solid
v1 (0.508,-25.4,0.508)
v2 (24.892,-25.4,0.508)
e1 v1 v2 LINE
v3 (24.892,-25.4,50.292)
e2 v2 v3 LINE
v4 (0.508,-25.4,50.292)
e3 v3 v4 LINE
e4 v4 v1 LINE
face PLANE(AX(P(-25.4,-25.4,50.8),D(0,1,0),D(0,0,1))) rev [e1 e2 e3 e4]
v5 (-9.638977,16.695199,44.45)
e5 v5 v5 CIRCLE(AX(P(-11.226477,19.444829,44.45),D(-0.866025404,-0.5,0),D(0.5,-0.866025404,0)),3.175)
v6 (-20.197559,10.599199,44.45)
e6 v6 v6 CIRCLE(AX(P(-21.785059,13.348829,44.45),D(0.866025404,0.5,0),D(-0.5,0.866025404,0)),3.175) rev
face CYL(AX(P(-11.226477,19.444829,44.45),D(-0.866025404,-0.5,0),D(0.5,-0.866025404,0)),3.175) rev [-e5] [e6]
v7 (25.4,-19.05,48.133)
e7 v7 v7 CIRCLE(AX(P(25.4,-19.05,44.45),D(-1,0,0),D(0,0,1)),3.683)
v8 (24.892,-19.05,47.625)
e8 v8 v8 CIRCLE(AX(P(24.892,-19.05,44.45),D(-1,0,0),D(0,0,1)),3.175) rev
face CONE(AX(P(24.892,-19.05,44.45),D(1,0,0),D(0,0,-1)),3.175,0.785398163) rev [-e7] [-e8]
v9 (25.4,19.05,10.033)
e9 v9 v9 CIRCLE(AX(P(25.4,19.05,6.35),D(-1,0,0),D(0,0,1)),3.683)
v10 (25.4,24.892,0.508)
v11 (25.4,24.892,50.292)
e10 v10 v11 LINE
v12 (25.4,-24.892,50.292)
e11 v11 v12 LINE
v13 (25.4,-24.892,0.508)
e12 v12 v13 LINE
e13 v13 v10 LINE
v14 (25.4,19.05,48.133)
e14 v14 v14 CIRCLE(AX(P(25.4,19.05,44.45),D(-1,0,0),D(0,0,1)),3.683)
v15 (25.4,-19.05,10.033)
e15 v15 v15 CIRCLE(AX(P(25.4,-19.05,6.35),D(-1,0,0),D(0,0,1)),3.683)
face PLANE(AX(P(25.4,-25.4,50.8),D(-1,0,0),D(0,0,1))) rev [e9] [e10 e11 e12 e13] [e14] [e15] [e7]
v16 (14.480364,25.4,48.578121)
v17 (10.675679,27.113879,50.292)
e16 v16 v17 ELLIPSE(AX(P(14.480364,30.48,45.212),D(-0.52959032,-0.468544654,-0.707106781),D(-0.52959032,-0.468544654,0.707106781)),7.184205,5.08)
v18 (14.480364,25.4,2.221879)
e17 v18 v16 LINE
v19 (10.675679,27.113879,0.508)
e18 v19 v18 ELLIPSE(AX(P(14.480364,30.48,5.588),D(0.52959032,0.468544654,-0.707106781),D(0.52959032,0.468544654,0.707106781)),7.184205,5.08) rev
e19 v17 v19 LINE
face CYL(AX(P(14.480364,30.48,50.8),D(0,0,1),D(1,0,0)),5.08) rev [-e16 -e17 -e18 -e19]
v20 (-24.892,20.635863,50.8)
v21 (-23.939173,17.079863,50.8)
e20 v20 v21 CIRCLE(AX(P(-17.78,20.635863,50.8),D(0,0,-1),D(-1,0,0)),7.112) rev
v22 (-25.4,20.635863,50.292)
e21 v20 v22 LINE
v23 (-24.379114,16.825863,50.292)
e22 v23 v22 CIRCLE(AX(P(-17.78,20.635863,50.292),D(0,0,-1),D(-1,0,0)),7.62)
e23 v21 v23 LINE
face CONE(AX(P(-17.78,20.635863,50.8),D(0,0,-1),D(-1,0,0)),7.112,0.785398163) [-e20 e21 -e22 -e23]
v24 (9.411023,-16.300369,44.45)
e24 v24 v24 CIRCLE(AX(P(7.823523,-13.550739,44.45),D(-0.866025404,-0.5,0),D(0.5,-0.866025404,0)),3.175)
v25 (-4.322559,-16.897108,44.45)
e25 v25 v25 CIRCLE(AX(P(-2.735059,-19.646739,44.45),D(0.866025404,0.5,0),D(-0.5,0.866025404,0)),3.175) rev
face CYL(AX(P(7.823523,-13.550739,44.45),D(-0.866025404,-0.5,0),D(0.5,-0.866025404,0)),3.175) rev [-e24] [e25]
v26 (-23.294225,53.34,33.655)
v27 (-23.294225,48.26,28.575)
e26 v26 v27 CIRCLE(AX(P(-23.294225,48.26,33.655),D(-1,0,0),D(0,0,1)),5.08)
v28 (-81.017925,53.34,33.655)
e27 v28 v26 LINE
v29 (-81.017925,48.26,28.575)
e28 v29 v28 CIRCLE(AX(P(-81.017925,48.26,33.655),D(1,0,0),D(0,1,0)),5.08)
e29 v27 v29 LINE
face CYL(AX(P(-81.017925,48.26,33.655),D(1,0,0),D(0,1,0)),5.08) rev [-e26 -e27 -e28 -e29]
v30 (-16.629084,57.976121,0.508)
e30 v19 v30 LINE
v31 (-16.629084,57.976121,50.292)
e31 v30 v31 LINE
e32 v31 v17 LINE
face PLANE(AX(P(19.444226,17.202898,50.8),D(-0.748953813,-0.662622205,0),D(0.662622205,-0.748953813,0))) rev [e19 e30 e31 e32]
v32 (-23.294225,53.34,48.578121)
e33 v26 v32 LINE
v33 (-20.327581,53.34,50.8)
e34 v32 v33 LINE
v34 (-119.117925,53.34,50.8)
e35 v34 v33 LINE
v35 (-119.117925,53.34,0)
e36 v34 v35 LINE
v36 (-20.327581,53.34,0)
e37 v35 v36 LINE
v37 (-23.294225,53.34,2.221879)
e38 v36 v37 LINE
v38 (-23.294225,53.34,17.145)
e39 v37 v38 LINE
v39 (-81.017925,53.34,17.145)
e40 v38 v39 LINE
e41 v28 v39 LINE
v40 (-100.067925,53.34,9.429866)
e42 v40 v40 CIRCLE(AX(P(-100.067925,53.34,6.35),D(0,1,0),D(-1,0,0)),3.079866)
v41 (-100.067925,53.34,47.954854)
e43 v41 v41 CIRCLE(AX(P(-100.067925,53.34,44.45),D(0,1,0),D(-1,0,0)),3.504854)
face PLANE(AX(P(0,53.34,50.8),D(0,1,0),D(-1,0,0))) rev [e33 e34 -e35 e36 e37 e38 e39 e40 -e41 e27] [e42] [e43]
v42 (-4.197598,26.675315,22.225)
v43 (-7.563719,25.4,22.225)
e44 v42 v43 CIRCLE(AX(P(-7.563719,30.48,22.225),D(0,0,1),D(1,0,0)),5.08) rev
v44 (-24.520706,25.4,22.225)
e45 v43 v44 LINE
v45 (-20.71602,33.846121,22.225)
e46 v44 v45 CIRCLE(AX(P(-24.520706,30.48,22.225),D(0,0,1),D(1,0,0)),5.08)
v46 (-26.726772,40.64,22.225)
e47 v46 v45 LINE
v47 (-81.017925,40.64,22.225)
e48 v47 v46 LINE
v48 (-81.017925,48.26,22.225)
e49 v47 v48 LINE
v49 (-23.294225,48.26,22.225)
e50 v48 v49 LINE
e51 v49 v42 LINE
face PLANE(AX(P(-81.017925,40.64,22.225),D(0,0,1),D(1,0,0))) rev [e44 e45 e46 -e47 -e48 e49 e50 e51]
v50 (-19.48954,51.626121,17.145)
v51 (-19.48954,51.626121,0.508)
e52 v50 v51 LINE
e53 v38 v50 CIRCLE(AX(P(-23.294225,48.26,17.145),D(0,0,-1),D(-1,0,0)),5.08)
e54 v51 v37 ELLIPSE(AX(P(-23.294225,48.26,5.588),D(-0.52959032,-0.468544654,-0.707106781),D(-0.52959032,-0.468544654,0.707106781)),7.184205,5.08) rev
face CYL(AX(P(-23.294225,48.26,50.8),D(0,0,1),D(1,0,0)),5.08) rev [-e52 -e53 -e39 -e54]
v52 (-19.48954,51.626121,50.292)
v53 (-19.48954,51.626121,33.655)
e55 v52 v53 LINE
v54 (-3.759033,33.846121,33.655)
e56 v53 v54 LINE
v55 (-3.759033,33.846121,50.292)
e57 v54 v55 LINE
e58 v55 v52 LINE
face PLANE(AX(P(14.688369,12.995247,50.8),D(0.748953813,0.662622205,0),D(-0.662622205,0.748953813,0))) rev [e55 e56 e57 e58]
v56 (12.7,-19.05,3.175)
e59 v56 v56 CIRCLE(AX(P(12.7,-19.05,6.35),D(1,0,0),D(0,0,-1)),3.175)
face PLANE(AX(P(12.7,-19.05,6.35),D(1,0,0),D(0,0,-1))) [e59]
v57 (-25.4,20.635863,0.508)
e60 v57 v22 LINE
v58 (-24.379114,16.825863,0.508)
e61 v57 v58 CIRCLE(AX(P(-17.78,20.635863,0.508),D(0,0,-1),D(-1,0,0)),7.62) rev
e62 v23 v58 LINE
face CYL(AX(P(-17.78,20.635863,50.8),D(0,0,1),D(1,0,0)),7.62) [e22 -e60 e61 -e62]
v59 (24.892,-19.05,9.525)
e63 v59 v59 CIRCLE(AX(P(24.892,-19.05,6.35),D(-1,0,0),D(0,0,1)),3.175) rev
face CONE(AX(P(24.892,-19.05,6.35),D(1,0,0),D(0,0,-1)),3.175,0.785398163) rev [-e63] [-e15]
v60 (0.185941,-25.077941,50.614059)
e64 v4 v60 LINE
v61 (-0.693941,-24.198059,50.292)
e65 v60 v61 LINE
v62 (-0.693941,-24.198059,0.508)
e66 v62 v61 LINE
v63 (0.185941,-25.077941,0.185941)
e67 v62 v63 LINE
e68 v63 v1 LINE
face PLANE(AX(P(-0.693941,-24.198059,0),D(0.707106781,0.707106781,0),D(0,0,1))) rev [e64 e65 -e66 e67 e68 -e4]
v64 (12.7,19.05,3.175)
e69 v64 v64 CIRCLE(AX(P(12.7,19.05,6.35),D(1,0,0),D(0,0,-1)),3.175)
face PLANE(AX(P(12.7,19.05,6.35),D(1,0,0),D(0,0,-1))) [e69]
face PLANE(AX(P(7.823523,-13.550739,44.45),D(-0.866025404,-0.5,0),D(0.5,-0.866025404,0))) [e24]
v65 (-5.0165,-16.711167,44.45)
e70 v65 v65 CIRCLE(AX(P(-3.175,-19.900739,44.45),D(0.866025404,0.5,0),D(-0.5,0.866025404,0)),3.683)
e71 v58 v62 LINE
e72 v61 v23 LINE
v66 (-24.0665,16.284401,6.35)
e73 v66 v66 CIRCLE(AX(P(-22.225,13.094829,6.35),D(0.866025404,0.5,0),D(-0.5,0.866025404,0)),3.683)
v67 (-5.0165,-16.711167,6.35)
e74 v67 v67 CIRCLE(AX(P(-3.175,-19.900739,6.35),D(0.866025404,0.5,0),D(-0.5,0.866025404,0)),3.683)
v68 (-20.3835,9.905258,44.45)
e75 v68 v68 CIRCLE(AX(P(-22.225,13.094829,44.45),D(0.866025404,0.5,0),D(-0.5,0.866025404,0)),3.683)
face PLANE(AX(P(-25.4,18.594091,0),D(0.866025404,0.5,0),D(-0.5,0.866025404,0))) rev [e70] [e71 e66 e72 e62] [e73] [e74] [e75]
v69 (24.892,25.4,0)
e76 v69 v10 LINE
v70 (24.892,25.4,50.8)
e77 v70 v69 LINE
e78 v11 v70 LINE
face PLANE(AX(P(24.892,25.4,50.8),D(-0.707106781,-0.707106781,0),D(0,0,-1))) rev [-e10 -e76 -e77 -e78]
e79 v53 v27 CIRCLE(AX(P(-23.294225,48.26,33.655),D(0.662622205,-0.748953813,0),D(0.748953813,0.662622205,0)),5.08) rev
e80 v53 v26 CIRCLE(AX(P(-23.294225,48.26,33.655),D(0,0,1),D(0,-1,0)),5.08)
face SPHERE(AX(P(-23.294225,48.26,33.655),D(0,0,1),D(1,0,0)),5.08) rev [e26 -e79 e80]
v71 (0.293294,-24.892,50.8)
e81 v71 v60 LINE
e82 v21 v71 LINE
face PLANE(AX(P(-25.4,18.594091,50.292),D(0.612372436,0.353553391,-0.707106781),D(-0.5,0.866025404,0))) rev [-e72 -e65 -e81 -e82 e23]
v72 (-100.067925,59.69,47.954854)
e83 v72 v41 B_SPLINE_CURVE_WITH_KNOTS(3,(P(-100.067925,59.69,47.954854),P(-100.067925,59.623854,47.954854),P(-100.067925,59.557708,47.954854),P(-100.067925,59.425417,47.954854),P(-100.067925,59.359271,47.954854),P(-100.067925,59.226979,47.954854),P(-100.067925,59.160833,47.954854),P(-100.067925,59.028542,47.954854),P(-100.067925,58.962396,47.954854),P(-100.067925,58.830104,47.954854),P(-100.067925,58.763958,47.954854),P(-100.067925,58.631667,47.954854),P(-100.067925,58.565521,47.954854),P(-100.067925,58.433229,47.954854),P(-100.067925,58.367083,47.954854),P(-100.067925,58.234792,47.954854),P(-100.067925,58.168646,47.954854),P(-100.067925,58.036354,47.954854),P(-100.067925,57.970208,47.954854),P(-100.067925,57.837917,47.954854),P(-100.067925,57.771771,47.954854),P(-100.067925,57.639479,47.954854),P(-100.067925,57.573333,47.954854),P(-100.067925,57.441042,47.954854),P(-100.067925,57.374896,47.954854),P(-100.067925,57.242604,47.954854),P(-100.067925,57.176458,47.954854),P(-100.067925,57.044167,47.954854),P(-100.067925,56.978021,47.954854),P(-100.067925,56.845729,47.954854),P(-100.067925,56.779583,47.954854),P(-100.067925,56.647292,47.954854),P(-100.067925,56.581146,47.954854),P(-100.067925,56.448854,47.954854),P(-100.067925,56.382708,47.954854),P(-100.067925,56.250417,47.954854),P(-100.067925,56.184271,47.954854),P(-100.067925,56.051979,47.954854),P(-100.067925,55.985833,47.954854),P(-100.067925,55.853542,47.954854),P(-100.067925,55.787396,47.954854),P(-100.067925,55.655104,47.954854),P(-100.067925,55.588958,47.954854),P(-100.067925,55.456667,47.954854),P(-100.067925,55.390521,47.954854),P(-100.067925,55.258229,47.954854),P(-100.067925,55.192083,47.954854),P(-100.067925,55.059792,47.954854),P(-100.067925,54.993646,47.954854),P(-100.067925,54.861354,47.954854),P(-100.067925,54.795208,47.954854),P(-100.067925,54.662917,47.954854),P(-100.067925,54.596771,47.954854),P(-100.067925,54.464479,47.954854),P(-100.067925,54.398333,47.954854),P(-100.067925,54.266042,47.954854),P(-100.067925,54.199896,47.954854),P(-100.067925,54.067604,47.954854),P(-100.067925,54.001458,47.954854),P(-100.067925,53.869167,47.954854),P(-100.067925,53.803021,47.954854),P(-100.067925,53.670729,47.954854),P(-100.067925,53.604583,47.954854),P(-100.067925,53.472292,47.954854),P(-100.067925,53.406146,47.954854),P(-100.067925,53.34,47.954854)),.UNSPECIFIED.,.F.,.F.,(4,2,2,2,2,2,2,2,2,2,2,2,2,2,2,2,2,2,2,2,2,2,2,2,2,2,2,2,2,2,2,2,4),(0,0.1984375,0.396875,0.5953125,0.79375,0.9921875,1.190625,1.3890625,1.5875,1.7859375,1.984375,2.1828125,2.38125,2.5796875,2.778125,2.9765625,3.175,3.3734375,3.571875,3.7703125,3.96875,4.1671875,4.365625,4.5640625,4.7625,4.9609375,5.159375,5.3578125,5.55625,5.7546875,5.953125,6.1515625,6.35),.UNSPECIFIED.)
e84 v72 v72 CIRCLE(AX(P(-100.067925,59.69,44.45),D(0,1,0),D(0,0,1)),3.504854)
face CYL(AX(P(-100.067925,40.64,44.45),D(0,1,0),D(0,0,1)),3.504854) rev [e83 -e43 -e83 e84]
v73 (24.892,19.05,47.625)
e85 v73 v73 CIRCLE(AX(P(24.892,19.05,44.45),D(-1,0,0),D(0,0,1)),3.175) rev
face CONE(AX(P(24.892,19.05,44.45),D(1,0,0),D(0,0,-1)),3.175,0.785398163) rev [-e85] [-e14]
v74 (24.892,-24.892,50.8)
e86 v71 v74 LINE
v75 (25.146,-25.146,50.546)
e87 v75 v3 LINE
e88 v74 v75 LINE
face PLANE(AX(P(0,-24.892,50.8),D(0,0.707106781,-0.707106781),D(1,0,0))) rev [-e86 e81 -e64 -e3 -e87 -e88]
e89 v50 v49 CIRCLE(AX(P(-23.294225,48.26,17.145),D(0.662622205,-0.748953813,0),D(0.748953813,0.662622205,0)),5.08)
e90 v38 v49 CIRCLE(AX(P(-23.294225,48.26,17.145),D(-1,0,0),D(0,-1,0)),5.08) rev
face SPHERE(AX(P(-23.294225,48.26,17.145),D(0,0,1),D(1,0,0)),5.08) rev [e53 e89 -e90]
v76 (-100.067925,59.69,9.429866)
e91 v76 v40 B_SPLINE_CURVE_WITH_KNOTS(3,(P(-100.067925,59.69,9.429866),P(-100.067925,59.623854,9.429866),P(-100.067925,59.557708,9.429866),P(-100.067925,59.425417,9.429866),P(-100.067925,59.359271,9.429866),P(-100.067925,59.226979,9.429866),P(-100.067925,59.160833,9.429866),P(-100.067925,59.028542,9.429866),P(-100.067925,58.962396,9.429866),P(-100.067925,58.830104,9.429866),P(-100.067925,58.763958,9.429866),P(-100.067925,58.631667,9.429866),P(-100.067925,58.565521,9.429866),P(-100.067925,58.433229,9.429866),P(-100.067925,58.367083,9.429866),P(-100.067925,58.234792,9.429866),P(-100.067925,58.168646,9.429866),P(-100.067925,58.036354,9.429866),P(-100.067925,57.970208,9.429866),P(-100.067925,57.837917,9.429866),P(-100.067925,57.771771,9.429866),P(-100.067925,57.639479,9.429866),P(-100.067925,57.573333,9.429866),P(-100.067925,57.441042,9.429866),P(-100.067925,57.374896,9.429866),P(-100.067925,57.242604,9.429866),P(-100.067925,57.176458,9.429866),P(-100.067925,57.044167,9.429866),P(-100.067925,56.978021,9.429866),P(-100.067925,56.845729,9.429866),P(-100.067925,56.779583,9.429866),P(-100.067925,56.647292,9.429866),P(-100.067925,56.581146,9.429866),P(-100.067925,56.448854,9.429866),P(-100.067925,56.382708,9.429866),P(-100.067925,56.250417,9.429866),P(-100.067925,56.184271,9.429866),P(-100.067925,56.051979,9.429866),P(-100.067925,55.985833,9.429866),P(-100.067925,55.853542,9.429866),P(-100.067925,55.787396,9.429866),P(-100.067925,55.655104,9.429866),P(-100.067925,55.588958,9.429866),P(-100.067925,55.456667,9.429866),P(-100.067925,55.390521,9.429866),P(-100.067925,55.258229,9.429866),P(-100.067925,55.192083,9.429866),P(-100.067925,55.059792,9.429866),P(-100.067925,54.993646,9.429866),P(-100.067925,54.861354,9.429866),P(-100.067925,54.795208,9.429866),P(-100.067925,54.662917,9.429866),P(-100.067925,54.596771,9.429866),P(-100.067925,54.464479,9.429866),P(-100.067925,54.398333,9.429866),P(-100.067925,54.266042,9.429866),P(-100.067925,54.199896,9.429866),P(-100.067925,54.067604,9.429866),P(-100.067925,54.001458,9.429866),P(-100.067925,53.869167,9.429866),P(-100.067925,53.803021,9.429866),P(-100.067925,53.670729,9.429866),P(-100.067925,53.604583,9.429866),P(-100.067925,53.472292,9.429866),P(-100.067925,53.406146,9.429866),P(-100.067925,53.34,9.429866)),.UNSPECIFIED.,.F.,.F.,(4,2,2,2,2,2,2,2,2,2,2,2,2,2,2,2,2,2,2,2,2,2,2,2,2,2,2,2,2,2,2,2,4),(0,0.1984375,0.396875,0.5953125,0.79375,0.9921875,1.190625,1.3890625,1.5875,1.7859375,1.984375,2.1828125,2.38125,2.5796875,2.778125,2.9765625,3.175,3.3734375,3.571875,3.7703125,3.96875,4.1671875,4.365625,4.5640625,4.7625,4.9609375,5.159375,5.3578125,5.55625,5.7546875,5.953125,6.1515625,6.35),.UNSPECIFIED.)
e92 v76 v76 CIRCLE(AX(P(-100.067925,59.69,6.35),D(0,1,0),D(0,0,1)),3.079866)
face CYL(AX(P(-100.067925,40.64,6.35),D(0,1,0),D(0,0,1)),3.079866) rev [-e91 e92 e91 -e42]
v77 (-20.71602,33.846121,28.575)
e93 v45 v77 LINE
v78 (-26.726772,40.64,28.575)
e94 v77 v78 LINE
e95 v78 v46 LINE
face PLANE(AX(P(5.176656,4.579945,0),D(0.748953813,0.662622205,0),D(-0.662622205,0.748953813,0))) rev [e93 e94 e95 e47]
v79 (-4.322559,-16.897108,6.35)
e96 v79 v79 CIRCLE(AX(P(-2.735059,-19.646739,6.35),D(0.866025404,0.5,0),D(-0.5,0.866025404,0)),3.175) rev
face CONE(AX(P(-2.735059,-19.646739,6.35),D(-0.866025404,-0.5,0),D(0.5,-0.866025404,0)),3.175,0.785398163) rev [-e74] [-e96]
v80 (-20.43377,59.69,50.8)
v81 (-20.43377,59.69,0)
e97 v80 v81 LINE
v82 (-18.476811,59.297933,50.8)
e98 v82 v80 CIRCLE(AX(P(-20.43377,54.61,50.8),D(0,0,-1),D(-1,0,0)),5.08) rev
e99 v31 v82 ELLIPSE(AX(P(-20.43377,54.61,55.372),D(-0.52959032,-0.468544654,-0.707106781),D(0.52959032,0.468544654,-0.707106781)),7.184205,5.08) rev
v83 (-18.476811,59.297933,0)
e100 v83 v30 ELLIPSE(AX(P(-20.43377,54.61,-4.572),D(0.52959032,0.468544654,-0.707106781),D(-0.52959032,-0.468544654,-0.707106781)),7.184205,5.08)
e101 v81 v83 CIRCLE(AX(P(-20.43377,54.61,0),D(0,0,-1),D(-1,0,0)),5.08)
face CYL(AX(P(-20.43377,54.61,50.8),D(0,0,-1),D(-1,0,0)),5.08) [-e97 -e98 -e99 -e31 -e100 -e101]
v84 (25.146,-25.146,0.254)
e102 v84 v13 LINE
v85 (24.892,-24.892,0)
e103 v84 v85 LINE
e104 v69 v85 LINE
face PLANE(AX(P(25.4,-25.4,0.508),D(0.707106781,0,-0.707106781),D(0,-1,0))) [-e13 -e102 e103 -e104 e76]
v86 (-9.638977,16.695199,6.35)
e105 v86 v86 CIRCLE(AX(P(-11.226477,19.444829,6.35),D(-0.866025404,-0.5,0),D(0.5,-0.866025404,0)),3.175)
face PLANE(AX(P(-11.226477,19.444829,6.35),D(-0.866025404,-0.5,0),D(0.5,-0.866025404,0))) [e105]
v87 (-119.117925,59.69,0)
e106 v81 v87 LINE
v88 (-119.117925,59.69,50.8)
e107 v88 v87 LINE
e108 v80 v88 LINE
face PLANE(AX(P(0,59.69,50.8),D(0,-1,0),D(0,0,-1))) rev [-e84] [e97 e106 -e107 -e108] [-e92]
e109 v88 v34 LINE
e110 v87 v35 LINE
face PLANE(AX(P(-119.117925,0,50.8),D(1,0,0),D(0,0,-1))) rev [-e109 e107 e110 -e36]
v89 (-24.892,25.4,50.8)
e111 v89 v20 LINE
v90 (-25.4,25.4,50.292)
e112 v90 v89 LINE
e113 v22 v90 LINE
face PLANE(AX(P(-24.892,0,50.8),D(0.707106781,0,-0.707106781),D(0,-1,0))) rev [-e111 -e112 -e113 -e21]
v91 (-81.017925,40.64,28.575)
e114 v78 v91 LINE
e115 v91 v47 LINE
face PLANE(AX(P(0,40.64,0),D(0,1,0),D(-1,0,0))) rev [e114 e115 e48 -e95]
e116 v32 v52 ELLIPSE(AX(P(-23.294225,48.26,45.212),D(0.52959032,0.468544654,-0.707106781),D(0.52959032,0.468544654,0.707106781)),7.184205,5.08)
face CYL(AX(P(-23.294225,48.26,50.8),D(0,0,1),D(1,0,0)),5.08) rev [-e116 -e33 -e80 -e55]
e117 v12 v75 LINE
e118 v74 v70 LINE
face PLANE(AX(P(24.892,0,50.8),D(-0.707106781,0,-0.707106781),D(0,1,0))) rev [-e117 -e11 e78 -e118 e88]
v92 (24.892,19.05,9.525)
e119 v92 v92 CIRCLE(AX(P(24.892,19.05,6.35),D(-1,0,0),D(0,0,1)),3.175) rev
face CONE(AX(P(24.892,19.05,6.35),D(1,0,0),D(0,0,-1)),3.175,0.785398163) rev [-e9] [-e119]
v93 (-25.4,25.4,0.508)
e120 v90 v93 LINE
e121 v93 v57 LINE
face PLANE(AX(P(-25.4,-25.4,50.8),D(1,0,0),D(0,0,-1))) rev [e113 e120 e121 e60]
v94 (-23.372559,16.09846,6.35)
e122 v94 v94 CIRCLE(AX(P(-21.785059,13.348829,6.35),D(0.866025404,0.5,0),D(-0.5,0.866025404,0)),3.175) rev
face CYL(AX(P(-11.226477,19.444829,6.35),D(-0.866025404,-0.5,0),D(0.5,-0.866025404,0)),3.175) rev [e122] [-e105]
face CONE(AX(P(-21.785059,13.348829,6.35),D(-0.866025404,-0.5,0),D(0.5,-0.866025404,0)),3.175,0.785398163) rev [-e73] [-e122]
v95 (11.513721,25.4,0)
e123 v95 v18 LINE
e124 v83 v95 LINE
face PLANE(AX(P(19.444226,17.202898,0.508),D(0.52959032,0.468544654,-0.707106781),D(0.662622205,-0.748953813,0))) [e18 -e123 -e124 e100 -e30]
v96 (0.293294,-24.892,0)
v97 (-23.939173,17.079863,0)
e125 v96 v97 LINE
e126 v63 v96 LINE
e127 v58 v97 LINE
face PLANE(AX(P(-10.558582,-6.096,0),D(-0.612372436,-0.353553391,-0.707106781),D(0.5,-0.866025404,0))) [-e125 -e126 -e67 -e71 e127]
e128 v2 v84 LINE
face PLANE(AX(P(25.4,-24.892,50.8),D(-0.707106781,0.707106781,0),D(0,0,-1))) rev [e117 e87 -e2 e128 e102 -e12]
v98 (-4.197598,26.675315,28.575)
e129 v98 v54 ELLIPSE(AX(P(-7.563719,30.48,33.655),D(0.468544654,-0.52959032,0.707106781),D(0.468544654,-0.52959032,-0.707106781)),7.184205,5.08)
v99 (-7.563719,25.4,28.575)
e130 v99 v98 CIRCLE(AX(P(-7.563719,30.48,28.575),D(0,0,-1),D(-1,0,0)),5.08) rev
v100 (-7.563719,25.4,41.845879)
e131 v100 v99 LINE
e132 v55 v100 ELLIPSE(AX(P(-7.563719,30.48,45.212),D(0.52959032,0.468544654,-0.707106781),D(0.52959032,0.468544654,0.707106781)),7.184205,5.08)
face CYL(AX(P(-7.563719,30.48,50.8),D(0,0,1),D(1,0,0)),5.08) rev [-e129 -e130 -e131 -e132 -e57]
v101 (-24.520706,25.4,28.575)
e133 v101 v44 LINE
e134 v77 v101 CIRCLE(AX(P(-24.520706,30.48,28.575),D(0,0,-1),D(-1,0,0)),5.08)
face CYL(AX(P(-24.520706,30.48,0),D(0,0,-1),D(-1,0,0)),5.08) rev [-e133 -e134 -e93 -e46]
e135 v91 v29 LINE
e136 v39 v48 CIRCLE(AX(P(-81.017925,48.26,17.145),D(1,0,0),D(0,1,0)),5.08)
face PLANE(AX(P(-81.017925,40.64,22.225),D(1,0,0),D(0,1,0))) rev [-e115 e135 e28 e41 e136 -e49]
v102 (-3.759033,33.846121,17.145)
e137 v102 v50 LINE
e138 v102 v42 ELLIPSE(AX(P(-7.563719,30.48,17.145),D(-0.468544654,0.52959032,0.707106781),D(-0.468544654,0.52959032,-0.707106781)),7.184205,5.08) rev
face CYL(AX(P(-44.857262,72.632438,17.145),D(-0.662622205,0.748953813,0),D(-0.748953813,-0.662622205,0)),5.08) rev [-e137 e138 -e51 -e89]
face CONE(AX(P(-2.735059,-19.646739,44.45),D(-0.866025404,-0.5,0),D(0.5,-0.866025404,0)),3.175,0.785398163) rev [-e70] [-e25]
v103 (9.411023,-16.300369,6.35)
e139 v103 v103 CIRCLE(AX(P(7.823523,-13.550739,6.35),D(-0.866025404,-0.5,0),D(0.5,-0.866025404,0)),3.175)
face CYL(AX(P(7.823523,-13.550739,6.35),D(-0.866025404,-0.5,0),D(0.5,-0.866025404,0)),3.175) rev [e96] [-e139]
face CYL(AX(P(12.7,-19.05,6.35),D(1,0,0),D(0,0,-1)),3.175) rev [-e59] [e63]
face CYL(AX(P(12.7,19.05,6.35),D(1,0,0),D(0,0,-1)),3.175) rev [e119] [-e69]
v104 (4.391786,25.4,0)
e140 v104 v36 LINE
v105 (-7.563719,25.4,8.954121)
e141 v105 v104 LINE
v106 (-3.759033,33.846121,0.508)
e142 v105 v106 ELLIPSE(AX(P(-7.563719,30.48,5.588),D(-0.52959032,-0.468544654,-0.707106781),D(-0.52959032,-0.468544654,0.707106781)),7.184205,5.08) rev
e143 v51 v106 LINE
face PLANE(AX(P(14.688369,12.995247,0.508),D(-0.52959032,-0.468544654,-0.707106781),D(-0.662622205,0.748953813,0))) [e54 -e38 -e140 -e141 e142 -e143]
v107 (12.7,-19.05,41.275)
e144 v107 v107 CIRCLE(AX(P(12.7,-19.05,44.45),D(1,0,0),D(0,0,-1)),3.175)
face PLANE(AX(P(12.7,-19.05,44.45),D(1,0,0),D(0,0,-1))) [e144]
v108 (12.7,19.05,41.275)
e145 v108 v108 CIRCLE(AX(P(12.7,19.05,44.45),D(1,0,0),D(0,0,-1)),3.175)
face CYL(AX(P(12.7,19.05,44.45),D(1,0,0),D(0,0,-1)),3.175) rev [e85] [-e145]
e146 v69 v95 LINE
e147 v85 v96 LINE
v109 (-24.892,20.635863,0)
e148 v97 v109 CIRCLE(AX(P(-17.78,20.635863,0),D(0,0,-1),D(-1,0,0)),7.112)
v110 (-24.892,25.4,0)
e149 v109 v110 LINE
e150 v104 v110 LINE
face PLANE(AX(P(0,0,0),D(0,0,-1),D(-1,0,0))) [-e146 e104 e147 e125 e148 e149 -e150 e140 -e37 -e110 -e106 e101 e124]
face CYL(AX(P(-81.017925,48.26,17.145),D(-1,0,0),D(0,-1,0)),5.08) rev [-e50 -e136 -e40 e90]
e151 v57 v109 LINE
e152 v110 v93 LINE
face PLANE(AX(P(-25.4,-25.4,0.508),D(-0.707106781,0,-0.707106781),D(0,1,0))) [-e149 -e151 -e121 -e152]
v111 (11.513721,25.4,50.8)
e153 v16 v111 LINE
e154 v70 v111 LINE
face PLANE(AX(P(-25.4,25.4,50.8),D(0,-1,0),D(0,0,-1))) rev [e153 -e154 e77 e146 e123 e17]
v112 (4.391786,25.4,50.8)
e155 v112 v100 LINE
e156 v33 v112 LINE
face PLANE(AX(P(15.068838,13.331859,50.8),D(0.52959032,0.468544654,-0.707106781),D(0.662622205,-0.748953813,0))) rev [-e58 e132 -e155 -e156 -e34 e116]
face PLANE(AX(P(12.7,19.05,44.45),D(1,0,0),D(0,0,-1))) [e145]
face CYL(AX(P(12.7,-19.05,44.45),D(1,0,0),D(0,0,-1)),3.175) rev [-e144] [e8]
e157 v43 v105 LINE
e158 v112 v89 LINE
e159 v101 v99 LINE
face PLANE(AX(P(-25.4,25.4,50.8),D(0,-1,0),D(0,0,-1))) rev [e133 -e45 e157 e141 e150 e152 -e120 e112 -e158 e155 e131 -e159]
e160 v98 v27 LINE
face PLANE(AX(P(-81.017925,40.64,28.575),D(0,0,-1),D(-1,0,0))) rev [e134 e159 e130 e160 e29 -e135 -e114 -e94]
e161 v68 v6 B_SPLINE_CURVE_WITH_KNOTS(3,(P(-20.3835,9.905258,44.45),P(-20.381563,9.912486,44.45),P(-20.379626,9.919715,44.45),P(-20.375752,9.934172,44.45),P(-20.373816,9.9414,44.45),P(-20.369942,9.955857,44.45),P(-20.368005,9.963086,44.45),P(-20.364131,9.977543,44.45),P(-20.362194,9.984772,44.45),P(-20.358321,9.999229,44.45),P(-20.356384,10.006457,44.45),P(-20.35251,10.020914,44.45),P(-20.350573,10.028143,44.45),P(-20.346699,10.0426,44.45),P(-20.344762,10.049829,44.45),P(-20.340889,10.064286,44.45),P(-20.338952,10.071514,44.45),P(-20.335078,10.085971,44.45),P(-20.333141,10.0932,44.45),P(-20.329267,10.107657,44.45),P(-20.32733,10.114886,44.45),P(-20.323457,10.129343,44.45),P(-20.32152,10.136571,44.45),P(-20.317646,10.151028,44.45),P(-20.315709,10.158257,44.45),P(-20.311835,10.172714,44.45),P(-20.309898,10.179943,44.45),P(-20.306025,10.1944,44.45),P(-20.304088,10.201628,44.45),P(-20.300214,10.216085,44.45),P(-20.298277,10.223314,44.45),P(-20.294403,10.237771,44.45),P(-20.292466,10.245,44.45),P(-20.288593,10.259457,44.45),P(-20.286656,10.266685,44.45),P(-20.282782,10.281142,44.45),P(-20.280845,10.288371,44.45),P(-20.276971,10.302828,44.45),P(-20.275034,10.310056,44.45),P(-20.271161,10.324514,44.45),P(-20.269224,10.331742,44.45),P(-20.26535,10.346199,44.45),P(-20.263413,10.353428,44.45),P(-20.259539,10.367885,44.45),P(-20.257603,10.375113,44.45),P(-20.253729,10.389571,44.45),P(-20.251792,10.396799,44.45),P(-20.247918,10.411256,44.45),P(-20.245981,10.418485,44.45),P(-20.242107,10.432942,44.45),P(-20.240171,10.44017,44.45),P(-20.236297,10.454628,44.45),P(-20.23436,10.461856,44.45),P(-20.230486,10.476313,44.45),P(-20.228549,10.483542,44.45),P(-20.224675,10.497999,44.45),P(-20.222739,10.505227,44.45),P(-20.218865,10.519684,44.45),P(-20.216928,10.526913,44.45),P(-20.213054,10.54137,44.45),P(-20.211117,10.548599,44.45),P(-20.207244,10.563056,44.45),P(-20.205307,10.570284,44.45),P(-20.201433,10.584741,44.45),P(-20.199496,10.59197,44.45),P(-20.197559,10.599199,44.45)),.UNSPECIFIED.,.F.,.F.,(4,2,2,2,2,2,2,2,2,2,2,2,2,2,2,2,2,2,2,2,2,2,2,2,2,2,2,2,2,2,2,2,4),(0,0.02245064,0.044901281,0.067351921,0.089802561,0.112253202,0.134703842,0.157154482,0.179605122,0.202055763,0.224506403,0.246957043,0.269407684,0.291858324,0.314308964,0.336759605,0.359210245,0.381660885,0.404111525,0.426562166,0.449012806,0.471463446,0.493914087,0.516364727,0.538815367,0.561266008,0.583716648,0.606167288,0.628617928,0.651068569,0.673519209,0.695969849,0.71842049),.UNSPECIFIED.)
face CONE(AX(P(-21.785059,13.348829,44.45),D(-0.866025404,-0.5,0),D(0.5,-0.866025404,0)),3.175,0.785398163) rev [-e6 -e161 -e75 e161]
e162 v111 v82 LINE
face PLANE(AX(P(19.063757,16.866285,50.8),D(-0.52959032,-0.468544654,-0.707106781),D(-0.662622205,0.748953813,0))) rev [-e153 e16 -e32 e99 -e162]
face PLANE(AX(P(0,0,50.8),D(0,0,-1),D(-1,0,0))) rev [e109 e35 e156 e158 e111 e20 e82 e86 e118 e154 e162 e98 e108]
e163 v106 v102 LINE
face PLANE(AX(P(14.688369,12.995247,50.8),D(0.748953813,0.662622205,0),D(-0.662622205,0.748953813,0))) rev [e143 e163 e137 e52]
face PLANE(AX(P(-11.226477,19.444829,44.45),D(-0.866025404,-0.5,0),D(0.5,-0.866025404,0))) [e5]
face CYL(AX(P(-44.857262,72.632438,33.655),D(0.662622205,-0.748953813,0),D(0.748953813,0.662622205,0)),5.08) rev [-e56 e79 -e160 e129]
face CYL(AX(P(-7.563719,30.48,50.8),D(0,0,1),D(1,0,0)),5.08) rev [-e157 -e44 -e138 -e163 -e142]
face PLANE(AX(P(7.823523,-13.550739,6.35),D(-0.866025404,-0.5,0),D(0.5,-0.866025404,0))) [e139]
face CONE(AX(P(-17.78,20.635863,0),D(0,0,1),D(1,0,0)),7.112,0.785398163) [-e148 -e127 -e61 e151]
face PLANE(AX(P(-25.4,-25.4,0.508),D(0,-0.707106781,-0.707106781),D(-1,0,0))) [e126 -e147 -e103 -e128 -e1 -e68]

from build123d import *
from OCP.BRepFilletAPI import BRepFilletAPI_MakeChamfer

# Parameters (mm, degrees)
SKETCH1_W           = 50.8
SKETCH1_H           = 50.8
BOSS_EXTRUDE1_DEPTH = 50.8
CUT_EXTRUDE1_DEPTH  = 50.8
SKETCH4_R           = 3.175
CUT_EXTRUDE2_DEPTH  = 12.7
SKETCH5_R           = 3.175
CUT_EXTRUDE3_DEPTH  = 12.7
CHAMFER1_SIZE       = 0.508
CHAMFER3_SIZE       = 0.508
CHAMFER3_SIZE2      = 1.38788181
FILLET3_R           = 7.62
BOSS_EXTRUDE2_DEPTH = 50.8
CHAMFER4_SIZE       = 0.508
CHAMFER5_SIZE       = 0.508
SKETCH7_R           = 3.079866406
SKETCH7_R_2         = 3.504854353
CUT_EXTRUDE4_DEPTH  = 19.05
SKETCH9_W           = 60.012063762
SKETCH9_H           = 6.35
BOSS_EXTRUDE4_DEPTH = 12.7
SKETCH10_W          = 6.35
SKETCH10_H          = 37.305371191
BOSS_EXTRUDE5_DEPTH = 12.7
FILLET6_R           = 5.08


with BuildPart() as part:
    # Sketch1 → Boss-Extrude1 (new body)
    with BuildSketch(Plane.XY):
        Rectangle(SKETCH1_W, SKETCH1_H)
    extrude(amount=BOSS_EXTRUDE1_DEPTH)

    # Sketch2 → Cut-Extrude1 (cut)
    with BuildSketch(Plane.XY.offset(50.8)):
        Polygon((-25.4, 18.594090512), (0, -25.4), (-25.4, -25.4), align=None)
    extrude(amount=-CUT_EXTRUDE1_DEPTH, mode=Mode.SUBTRACT)

    # Sketch4 → Cut-Extrude2 (cut)
    with BuildSketch(Plane(origin=(25.4, 0, 0), x_dir=(0, 0, -1), z_dir=(1, 0, 0))):
        with Locations((-44.45, 19.05)):
            Circle(SKETCH4_R)
        with Locations((-6.35, 19.05)):
            Circle(SKETCH4_R)
        with Locations((-6.35, -19.05)):
            Circle(SKETCH4_R)
        with Locations((-44.45, -19.05)):
            Circle(SKETCH4_R)
    extrude(amount=-CUT_EXTRUDE2_DEPTH, mode=Mode.SUBTRACT)

    # Sketch5 → Cut-Extrude3 (cut)
    with BuildSketch(Plane(origin=(-10.998522628, -6.35, 0), x_dir=(0, 0, 1), z_dir=(-0.8660254037844364, -0.5000000000000041, 0))):
        with Locations(Location((6.35, 22.452954744, 0), (0, 0, 270))):
            Circle(SKETCH5_R)
        with Locations(Location((44.45, 22.452954744, 0), (0, 0, 270))):
            Circle(SKETCH5_R)
        with Locations(Location((44.45, -15.647045256, 0), (0, 0, 270))):
            Circle(SKETCH5_R)
        with Locations(Location((6.35, -15.647045256, 0), (0, 0, 270))):
            Circle(SKETCH5_R)
    extrude(amount=-CUT_EXTRUDE3_DEPTH, mode=Mode.SUBTRACT)

    # Chamfer1
    chamfer1_edges = [part.edges().sort_by_distance(p)[0] for p in [
        (25.4, -19.05, 47.625),
        (25.4, -19.05, 9.525),
        (25.4, 19.05, 9.525),
        (25.4, 19.05, 47.625),
        (25.4, 0, 50.8),
        (25.4, 0, 0),
        (25.4, -25.4, 25.4),
        (25.4, 25.4, 25.4),
    ]]
    chamfer(chamfer1_edges, length=CHAMFER1_SIZE)

    # Chamfer3: one chamfer whose edges measure the first distance from different faces: ONE call of the kernel's chamfer builder (chamfer() names one face for all edges)
    chamfer3_edges_1 = [part.edges().sort_by_distance(p)[0] for p in [
        (0, -25.4, 25.4),
    ]]
    chamfer3_side_1 = [part.faces().sort_by_distance(p)[0] for p in [
        (12.446, -25.4, 25.4),
    ]]
    chamfer3_edges_2 = [part.edges().sort_by_distance(p)[0] for p in [
        (-4.7625, -17.151108029, 6.35),
        (-4.7625, -17.151108029, 44.45),
        (-23.8125, 15.844459855, 44.45),
        (-23.8125, 15.844459855, 6.35),
    ]]
    chamfer3 = BRepFilletAPI_MakeChamfer(part.part.solid().wrapped)
    for e in chamfer3_edges_1:
        chamfer3.Add(CHAMFER3_SIZE, CHAMFER3_SIZE2, e.wrapped, chamfer3_side_1[0].wrapped)  # the first distance lies on this face
    for e in chamfer3_edges_2:
        chamfer3.Add(CHAMFER3_SIZE, e.wrapped)
    add(Compound.cast(chamfer3.Shape()), mode=Mode.REPLACE)

    # Fillet3
    fillet3_edges = [part.edges().sort_by_distance(p)[0] for p in [
        (-25.4, 18.594090512, 25.4),
    ]]
    fillet(fillet3_edges, radius=FILLET3_R)

    # Sketch6 → Boss-Extrude2 (add, through all)
    with BuildSketch(Plane(origin=(0, 0, 0), x_dir=(-1, 0, 0), z_dir=(0, 0, -1))):
        Polygon((18.145405324, 59.69), (-12.192, 25.4), (-3.713506547, 25.4), (21.005860753, 53.34), (119.117924515, 53.34), (119.117924515, 59.69), align=None)
    extrude(amount=-BOSS_EXTRUDE2_DEPTH)

    # Chamfer4
    # the kernel refuses this chamfer: 0.508 mm, written as the material it takes off along each edge
    with BuildSketch(Plane(origin=(-0.798414958, -25.4, 0), x_dir=(0, 0.9996219169112968, -0.027495876610586417), z_dir=(1, 0, 0)), Plane(origin=(-0.798414958, -25.4, 50.8), x_dir=(0, -0.027495876610587118, -0.9996219169112968), z_dir=(1, 0, 0))) as chamfer4_piece_1:
        Polygon((CHAMFER4_SIZE * 0.999621916911, CHAMFER4_SIZE * 0.0274958766106), (-CHAMFER4_SIZE * 0.0274958766106, CHAMFER4_SIZE * 0.999621916911), (0, 0), align=None)
    extrude(amount=26.996829916, mode=Mode.SUBTRACT)
    with BuildSketch(Plane(origin=(-25.4, 26.706414958, 50.8), x_dir=(-0.027495876610587118, 0, -0.9996219169112968), z_dir=(0, -1, 0)), Plane(origin=(-25.4, 26.706414958, 0), x_dir=(0.9996219169112968, 0, -0.027495876610586417), z_dir=(0, -1, 0))) as chamfer4_piece_2:
        Polygon((CHAMFER4_SIZE * 0.999621916911, CHAMFER4_SIZE * 0.0274958766106), (-CHAMFER4_SIZE * 0.0274958766106, CHAMFER4_SIZE * 0.999621916911), (0, 0), align=None)
    extrude(amount=6.070551599, mode=Mode.SUBTRACT)
    with BuildSketch(Plane(origin=(-17.78, 20.635863359, 50.8), x_dir=(-0.8660254037844363, -0.5000000000000041, 0), z_dir=(0.5000000000000041, -0.8660254037844363, 0))) as chamfer4_piece_3:
        Polygon((7.62, CHAMFER4_SIZE), (7.62 - CHAMFER4_SIZE, 0), (7.62, 0), align=None)
    revolve(axis=Axis((-17.78, 20.635863359, 50.8), (0, 0, -1)), revolution_arc=30, mode=Mode.SUBTRACT)
    with BuildSketch(Plane(origin=(-24.379113577, 16.825863359, 50.8), x_dir=(-0.023812127644096983, -0.013747938305297273, -0.9996219169112965), z_dir=(0.5000000000000041, -0.8660254037844363, 0)), Plane(origin=(-24.379113577, 16.825863359, 0), x_dir=(0.8656979742248779, 0.4998109584556525, -0.027495876610586285), z_dir=(0.5000000000000041, -0.8660254037844363, 0))) as chamfer4_piece_4:
        Polygon((CHAMFER4_SIZE * 0.999621916911, CHAMFER4_SIZE * 0.0274958766106), (-CHAMFER4_SIZE * 0.0274958766106, CHAMFER4_SIZE * 0.999621916911), (0, 0), align=None)
    extrude(amount=48.676760301, mode=Mode.SUBTRACT)
    with BuildSketch(Plane(origin=(-17.78, 20.635863359, 0), x_dir=(-0.8660254037844363, -0.5000000000000041, 0), z_dir=(0.5000000000000041, -0.8660254037844363, 0))) as chamfer4_piece_5:
        Polygon((7.62 - CHAMFER4_SIZE, 0), (7.62, -CHAMFER4_SIZE), (7.62, 0), align=None)
    revolve(axis=Axis((-17.78, 20.635863359, 0), (0, 0, -1)), revolution_arc=30, mode=Mode.SUBTRACT)

    # Chamfer5
    chamfer5_edges = [part.edges().sort_by_distance(p)[0] for p in [
        (-8.646177103, 39.37, 0),
        (-2.976702662, 42.545, 0),
        (-8.646177103, 39.37, 50.8),
        (-2.976702662, 42.545, 50.8),
    ]]
    chamfer(chamfer5_edges, length=CHAMFER5_SIZE)

    # Sketch7 → Cut-Extrude4 (cut)
    with BuildSketch(Plane(origin=(0, 59.69, 0), x_dir=(1, 0, 0), z_dir=(0, 1, 0))):
        with Locations(Location((-100.067924515, -6.35, 0), (0, 0, 270))):
            Circle(SKETCH7_R)
        with Locations(Location((-100.067924515, -44.45, 0), (0, 0, 270))):
            Circle(SKETCH7_R_2)
    extrude(amount=-CUT_EXTRUDE4_DEPTH, mode=Mode.SUBTRACT)

    # Sketch9 → Boss-Extrude4 (add)
    with BuildSketch(Plane(origin=(0, 53.34, 0), x_dir=(-1, 0, 0), z_dir=(0, -1, 0))):
        with Locations((51.011892634, -25.4)):
            Rectangle(SKETCH9_W, SKETCH9_H)
    extrude(amount=BOSS_EXTRUDE4_DEPTH)

    # Sketch10 → Boss-Extrude5 (add)
    with BuildSketch(Plane(origin=(14.688369002, 12.995246543, 0), x_dir=(0, 0, 1), z_dir=(-0.7489538130165907, -0.6626222045539297, 0))):
        with Locations((25.4, 35.215460552)):
            Rectangle(SKETCH10_W, SKETCH10_H)
    extrude(amount=BOSS_EXTRUDE5_DEPTH)

    # Fillet6
    fillet6_edges = [part.edges().sort_by_distance(p)[0] for p in [
        (-51.011892634, 53.34, 22.225),
        (-8.646177103, 39.37, 22.225),
        (-8.646177103, 39.37, 28.575),
        (-51.011892634, 53.34, 28.575),
        (-13.243480358, 25.4, 25.4),
        (3.713506547, 25.4, 39.4335),
        (3.713506547, 25.4, 11.3665),
        (-21.005860753, 53.34, 39.4335),
        (-21.005860753, 53.34, 11.3665),
        (-18.145405324, 59.69, 25.4),
        (12.192, 25.4, 25.4),
    ]]
    fillet(fillet6_edges, radius=FILLET6_R)


solid = part.part
